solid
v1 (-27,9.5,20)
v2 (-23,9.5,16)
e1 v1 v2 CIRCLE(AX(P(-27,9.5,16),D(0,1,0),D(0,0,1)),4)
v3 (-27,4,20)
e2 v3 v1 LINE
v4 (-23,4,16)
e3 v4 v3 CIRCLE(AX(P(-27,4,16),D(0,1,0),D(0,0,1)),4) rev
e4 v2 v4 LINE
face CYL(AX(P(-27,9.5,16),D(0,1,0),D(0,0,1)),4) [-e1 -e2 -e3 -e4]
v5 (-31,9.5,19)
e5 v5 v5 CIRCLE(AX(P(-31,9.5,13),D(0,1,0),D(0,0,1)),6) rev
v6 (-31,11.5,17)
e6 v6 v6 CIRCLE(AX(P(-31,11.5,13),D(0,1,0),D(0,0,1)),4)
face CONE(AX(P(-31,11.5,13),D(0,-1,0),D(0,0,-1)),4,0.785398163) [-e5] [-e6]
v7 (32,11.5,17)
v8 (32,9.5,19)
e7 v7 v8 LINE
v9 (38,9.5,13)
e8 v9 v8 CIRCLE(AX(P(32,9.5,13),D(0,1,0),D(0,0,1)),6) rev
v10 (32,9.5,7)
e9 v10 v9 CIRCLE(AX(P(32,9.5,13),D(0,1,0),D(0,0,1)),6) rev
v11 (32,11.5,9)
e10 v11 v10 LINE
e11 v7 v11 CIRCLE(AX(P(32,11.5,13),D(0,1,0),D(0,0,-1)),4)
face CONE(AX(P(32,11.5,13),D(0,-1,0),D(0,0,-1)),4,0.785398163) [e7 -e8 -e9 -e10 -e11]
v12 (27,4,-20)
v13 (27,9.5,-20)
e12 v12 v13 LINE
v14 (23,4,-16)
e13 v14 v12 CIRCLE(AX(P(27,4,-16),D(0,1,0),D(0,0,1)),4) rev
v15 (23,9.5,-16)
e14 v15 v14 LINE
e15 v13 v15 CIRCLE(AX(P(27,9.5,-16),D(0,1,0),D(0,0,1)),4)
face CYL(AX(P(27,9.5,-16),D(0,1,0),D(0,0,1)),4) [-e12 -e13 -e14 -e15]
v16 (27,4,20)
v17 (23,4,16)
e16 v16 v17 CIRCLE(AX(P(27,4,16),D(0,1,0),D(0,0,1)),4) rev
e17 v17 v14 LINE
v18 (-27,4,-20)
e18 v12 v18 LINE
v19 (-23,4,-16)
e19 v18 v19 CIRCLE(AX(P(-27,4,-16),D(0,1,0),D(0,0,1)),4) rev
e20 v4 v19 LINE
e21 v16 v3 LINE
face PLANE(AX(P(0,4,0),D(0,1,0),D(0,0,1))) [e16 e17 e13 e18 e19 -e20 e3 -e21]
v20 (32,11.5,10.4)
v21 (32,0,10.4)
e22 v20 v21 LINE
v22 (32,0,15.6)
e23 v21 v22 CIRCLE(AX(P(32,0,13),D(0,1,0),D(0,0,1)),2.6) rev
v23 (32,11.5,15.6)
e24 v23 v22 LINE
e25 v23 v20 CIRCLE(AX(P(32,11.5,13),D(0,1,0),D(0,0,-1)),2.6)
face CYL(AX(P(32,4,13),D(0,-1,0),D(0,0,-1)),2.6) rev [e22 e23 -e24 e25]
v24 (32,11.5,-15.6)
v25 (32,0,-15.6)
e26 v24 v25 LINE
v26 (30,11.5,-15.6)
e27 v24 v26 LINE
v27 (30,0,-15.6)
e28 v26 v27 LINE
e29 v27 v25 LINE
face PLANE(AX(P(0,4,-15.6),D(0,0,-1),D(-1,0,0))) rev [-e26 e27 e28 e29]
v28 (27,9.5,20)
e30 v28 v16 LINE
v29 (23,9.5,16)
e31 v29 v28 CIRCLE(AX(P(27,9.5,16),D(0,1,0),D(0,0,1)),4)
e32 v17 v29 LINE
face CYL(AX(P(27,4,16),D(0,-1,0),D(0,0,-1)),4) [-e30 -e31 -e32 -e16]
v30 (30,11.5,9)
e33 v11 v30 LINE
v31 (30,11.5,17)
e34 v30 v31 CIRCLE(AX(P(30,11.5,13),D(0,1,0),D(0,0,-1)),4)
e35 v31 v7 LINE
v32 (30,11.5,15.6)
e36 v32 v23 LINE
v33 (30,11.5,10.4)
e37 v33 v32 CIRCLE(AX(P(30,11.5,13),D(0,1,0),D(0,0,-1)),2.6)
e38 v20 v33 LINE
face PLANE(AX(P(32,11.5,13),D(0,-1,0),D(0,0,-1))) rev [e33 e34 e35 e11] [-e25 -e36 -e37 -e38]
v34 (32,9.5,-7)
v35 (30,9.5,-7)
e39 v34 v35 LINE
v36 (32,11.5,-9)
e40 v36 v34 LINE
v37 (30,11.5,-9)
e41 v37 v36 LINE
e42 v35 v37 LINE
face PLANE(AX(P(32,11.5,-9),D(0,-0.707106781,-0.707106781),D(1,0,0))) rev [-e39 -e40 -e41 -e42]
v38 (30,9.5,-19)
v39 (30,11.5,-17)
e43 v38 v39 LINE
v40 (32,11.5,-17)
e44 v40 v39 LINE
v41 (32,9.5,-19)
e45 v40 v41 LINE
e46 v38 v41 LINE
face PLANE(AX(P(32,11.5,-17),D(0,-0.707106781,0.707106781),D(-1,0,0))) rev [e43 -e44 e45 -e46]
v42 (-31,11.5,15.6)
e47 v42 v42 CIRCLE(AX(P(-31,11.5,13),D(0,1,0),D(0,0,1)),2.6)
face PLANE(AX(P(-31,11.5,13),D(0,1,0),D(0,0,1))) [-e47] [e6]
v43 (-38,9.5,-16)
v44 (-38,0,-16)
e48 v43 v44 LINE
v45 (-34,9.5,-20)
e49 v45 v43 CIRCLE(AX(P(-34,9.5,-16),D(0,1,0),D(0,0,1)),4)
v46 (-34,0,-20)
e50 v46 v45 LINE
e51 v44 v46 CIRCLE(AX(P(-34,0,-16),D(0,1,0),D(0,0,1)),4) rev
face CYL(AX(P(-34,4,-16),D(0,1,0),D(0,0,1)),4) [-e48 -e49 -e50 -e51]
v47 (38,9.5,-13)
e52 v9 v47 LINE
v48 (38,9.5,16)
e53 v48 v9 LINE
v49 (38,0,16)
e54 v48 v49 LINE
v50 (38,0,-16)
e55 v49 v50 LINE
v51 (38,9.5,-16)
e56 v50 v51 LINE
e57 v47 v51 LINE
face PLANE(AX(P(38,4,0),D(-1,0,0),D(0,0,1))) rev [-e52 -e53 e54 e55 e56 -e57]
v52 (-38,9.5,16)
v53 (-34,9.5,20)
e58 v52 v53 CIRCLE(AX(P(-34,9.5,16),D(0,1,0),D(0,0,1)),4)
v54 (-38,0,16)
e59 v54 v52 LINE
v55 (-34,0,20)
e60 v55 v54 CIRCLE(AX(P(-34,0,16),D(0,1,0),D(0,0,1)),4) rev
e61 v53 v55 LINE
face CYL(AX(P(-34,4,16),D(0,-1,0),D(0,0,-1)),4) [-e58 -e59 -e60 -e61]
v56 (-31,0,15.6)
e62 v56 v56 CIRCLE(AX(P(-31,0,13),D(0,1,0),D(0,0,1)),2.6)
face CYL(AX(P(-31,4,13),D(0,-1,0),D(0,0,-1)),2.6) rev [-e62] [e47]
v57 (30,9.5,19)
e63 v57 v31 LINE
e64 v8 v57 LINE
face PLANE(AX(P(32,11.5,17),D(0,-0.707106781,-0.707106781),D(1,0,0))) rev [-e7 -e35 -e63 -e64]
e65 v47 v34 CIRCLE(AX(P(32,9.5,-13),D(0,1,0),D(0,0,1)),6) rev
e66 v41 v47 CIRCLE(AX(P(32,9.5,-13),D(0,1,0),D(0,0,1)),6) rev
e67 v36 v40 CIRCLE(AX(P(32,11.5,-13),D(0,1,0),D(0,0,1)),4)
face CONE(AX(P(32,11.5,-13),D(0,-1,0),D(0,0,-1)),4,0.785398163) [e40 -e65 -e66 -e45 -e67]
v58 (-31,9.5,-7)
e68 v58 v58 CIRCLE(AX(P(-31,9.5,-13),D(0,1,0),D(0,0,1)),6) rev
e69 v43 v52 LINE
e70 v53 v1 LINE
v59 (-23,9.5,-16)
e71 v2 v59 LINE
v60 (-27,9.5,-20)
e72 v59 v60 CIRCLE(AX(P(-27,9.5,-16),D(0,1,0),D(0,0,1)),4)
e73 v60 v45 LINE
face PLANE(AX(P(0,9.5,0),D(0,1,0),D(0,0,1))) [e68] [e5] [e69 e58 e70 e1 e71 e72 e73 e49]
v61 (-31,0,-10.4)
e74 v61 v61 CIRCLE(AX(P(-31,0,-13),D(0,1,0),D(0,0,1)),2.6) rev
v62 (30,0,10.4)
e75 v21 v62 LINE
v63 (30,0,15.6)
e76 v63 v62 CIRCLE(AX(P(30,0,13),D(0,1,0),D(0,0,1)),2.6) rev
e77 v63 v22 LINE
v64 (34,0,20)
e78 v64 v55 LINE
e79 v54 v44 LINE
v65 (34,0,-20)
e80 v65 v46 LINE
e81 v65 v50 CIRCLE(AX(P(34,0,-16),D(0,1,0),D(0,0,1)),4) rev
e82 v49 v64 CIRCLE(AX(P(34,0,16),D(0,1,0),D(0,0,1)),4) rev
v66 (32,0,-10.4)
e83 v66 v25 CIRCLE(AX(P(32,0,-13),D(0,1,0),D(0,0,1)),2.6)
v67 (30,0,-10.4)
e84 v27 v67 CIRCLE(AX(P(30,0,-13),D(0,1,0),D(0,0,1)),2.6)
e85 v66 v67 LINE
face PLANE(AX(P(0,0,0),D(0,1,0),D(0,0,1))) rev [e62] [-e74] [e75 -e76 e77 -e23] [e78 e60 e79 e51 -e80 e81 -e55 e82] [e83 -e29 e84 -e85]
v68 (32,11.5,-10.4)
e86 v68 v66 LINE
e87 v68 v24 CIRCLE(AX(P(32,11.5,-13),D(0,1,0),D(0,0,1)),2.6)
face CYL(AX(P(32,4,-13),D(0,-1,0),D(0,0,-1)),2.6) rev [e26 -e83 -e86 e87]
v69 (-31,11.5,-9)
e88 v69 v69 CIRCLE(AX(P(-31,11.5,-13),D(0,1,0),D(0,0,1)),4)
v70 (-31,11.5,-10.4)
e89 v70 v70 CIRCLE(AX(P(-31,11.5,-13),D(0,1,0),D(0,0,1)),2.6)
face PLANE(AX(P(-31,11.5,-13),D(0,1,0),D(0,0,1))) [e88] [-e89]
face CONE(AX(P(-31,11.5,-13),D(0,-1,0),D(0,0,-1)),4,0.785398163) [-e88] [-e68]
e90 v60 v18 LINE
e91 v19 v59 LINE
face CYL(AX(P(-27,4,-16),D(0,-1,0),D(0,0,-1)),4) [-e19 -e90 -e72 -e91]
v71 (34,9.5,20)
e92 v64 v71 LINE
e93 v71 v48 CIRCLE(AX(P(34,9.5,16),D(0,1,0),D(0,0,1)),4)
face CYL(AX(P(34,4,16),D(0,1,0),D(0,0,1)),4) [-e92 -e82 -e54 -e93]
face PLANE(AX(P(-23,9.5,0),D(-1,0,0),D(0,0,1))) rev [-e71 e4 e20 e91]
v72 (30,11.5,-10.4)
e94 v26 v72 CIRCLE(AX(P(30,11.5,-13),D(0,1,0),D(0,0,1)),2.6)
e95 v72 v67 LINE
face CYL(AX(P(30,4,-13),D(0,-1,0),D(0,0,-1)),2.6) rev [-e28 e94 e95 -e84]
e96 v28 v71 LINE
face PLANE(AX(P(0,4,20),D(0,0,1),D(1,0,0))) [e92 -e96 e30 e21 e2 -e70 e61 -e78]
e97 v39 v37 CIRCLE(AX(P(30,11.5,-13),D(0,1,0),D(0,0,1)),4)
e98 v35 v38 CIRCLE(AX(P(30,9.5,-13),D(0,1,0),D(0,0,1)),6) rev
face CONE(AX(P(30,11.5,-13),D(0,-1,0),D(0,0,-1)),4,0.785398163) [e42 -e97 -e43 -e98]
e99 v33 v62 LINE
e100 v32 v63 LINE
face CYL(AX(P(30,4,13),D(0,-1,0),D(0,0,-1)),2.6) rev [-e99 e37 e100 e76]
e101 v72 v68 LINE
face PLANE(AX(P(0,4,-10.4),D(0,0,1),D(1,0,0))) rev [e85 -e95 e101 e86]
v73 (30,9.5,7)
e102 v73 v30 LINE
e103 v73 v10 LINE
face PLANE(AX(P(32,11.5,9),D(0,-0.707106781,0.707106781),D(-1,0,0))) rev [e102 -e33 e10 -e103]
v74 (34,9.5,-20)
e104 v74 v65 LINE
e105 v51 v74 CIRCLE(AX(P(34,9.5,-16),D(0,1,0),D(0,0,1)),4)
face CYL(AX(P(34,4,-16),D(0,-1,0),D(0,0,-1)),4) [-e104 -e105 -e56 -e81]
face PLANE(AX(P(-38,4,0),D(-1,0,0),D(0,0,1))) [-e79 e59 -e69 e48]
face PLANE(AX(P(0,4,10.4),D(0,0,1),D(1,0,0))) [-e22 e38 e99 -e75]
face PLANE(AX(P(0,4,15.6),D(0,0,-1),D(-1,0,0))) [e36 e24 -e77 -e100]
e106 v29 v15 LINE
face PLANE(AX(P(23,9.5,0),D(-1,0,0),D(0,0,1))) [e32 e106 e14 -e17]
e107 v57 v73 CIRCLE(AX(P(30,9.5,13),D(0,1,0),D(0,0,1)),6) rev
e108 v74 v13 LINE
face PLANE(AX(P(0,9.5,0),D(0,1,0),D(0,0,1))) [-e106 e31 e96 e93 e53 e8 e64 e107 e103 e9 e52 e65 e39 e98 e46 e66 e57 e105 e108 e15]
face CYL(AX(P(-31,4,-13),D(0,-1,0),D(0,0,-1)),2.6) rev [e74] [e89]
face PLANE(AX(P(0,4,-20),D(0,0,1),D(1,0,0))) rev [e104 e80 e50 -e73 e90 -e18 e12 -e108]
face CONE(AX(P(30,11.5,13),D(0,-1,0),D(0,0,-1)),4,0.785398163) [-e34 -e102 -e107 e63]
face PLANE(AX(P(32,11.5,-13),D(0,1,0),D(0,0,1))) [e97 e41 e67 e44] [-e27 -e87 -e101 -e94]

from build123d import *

# Parameters (mm, degrees)
SKETCH1_W           = 76
SKETCH1_H           = 40
SKETCH1_R           = 2.6
BOSS_EXTRUDE1_DEPTH = 4
SKETCH2_W           = 15
SKETCH2_H           = 40
SKETCH2_R           = 2.6
BOSS_EXTRUDE2_DEPTH = 5.5
SKETCH3_R           = 4
SKETCH3_R_2         = 2.6
BOSS_EXTRUDE3_DEPTH = 2
CHAMFER1_SIZE       = 2
FILLET1_R           = 4


with BuildPart() as part:
    # Sketch1 → Boss-Extrude1 (new body)
    with BuildSketch(Plane(origin=(0, 0, 0), x_dir=(1, 0, 0), z_dir=(0, 1, 0))):
        Rectangle(SKETCH1_W, SKETCH1_H)
        with Locations(Location((-31, -13, 0), (0, 0, 270))):
            Circle(SKETCH1_R, mode=Mode.SUBTRACT)
        with Locations(Location((-31, 13, 0), (0, 0, 270))):
            Circle(SKETCH1_R, mode=Mode.SUBTRACT)
        with BuildLine():
            Line((30, 15.6), (32, 15.6))
            ThreePointArc((32, 15.6), (34.6, 13), (32, 10.4))
            Line((32, 10.4), (30, 10.4))
            ThreePointArc((30, 10.4), (27.4, 13), (30, 15.6))
        make_face(mode=Mode.SUBTRACT)
        with BuildLine():
            Line((32, -10.4), (30, -10.4))
            ThreePointArc((30, -10.4), (27.4, -13), (30, -15.6))
            Line((30, -15.6), (32, -15.6))
            ThreePointArc((32, -15.6), (34.6, -13), (32, -10.4))
        make_face(mode=Mode.SUBTRACT)
    extrude(amount=BOSS_EXTRUDE1_DEPTH)

    # Sketch2 → Boss-Extrude2 (add)
    # profile 1 of 2: a face of its own
    with BuildSketch(Plane(origin=(0, 4, 0), x_dir=(1, 0, 0), z_dir=(0, 1, 0))):
        with Locations((30.5, 0)):
            Rectangle(SKETCH2_W, SKETCH2_H)
        with BuildLine():
            ThreePointArc((30, -15.6), (27.4, -13), (30, -10.4))
            Line((30, -10.4), (32, -10.4))
            ThreePointArc((32, -10.4), (34.6, -13), (32, -15.6))
            Line((32, -15.6), (30, -15.6))
        make_face(mode=Mode.SUBTRACT)
        with BuildLine():
            ThreePointArc((30, 10.4), (27.4, 13), (30, 15.6))
            Line((30, 15.6), (32, 15.6))
            ThreePointArc((32, 15.6), (34.6, 13), (32, 10.4))
            Line((32, 10.4), (30, 10.4))
        make_face(mode=Mode.SUBTRACT)
    # profile 2 of 2: a face of its own
    with BuildSketch(Plane(origin=(0, 4, 0), x_dir=(1, 0, 0), z_dir=(0, 1, 0))):
        with Locations((-30.5, 0)):
            Rectangle(SKETCH2_W, SKETCH2_H)
        with Locations((-31, -13)):
            Circle(SKETCH2_R, mode=Mode.SUBTRACT)
        with Locations((-31, 13)):
            Circle(SKETCH2_R, mode=Mode.SUBTRACT)
    extrude(amount=BOSS_EXTRUDE2_DEPTH)

    # Sketch3 → Boss-Extrude3 (add)
    # profile 1 of 4: a face of its own
    with BuildSketch(Plane(origin=(0, 9.5, 0), x_dir=(1, 0, 0), z_dir=(0, 1, 0))):
        with Locations(Location((-31, 13, 0), (0, 0, 270))):
            Circle(SKETCH3_R)
        with Locations(Location((-31, 13, 0), (0, 0, 270))):
            Circle(SKETCH3_R_2, mode=Mode.SUBTRACT)
    # profile 2 of 4: a face of its own
    with BuildSketch(Plane(origin=(0, 9.5, 0), x_dir=(1, 0, 0), z_dir=(0, 1, 0))):
        with Locations(Location((-31, -13, 0), (0, 0, 270))):
            Circle(SKETCH3_R)
        with Locations(Location((-31, -13, 0), (0, 0, 270))):
            Circle(SKETCH3_R_2, mode=Mode.SUBTRACT)
    # profile 3 of 4: a face of its own
    with BuildSketch(Plane(origin=(0, 9.5, 0), x_dir=(1, 0, 0), z_dir=(0, 1, 0))):
        with BuildLine():
            Line((32, 17), (30, 17))
            ThreePointArc((30, 17), (26, 13), (30, 9))
            Line((30, 9), (32, 9))
            ThreePointArc((32, 9), (36, 13), (32, 17))
        make_face()
        with BuildLine():
            Line((30, 15.6), (32, 15.6))
            ThreePointArc((32, 15.6), (34.6, 13), (32, 10.4))
            Line((32, 10.4), (30, 10.4))
            ThreePointArc((30, 10.4), (27.4, 13), (30, 15.6))
        make_face(mode=Mode.SUBTRACT)
    # profile 4 of 4: a face of its own
    with BuildSketch(Plane(origin=(0, 9.5, 0), x_dir=(1, 0, 0), z_dir=(0, 1, 0))):
        with BuildLine():
            Line((32, -9), (30, -9))
            ThreePointArc((30, -9), (26, -13), (30, -17))
            Line((30, -17), (32, -17))
            ThreePointArc((32, -17), (36, -13), (32, -9))
        make_face()
        with BuildLine():
            Line((32, -10.4), (30, -10.4))
            ThreePointArc((30, -10.4), (27.4, -13), (30, -15.6))
            Line((30, -15.6), (32, -15.6))
            ThreePointArc((32, -15.6), (34.6, -13), (32, -10.4))
        make_face(mode=Mode.SUBTRACT)
    extrude(amount=BOSS_EXTRUDE3_DEPTH)

    # Chamfer1
    chamfer1_edges = [part.edges().sort_by_distance(p)[0] for p in [
        (-31, 9.5, 9),
        (-31, 9.5, -17),
        (31, 9.5, -17),
        (26, 9.5, -13),
        (31, 9.5, -9),
        (36, 9.5, -13),
        (31, 9.5, 9),
        (26, 9.5, 13),
        (36, 9.5, 13),
        (31, 9.5, 17),
    ]]
    chamfer(chamfer1_edges, length=CHAMFER1_SIZE - 0.0001)  # a hair under: the kernel refuses the full size

    # Fillet1
    fillet1_edges = [part.edges().sort_by_distance(p)[0] for p in [
        (38, 4.75, 20),
        (-38, 4.75, 20),
        (-38, 4.75, -20),
        (38, 4.75, -20),
        (-23, 6.75, 20),
        (-23, 6.75, -20),
        (23, 6.75, -20),
        (23, 6.75, 20),
    ]]
    fillet(fillet1_edges, radius=FILLET1_R)


solid = part.part
